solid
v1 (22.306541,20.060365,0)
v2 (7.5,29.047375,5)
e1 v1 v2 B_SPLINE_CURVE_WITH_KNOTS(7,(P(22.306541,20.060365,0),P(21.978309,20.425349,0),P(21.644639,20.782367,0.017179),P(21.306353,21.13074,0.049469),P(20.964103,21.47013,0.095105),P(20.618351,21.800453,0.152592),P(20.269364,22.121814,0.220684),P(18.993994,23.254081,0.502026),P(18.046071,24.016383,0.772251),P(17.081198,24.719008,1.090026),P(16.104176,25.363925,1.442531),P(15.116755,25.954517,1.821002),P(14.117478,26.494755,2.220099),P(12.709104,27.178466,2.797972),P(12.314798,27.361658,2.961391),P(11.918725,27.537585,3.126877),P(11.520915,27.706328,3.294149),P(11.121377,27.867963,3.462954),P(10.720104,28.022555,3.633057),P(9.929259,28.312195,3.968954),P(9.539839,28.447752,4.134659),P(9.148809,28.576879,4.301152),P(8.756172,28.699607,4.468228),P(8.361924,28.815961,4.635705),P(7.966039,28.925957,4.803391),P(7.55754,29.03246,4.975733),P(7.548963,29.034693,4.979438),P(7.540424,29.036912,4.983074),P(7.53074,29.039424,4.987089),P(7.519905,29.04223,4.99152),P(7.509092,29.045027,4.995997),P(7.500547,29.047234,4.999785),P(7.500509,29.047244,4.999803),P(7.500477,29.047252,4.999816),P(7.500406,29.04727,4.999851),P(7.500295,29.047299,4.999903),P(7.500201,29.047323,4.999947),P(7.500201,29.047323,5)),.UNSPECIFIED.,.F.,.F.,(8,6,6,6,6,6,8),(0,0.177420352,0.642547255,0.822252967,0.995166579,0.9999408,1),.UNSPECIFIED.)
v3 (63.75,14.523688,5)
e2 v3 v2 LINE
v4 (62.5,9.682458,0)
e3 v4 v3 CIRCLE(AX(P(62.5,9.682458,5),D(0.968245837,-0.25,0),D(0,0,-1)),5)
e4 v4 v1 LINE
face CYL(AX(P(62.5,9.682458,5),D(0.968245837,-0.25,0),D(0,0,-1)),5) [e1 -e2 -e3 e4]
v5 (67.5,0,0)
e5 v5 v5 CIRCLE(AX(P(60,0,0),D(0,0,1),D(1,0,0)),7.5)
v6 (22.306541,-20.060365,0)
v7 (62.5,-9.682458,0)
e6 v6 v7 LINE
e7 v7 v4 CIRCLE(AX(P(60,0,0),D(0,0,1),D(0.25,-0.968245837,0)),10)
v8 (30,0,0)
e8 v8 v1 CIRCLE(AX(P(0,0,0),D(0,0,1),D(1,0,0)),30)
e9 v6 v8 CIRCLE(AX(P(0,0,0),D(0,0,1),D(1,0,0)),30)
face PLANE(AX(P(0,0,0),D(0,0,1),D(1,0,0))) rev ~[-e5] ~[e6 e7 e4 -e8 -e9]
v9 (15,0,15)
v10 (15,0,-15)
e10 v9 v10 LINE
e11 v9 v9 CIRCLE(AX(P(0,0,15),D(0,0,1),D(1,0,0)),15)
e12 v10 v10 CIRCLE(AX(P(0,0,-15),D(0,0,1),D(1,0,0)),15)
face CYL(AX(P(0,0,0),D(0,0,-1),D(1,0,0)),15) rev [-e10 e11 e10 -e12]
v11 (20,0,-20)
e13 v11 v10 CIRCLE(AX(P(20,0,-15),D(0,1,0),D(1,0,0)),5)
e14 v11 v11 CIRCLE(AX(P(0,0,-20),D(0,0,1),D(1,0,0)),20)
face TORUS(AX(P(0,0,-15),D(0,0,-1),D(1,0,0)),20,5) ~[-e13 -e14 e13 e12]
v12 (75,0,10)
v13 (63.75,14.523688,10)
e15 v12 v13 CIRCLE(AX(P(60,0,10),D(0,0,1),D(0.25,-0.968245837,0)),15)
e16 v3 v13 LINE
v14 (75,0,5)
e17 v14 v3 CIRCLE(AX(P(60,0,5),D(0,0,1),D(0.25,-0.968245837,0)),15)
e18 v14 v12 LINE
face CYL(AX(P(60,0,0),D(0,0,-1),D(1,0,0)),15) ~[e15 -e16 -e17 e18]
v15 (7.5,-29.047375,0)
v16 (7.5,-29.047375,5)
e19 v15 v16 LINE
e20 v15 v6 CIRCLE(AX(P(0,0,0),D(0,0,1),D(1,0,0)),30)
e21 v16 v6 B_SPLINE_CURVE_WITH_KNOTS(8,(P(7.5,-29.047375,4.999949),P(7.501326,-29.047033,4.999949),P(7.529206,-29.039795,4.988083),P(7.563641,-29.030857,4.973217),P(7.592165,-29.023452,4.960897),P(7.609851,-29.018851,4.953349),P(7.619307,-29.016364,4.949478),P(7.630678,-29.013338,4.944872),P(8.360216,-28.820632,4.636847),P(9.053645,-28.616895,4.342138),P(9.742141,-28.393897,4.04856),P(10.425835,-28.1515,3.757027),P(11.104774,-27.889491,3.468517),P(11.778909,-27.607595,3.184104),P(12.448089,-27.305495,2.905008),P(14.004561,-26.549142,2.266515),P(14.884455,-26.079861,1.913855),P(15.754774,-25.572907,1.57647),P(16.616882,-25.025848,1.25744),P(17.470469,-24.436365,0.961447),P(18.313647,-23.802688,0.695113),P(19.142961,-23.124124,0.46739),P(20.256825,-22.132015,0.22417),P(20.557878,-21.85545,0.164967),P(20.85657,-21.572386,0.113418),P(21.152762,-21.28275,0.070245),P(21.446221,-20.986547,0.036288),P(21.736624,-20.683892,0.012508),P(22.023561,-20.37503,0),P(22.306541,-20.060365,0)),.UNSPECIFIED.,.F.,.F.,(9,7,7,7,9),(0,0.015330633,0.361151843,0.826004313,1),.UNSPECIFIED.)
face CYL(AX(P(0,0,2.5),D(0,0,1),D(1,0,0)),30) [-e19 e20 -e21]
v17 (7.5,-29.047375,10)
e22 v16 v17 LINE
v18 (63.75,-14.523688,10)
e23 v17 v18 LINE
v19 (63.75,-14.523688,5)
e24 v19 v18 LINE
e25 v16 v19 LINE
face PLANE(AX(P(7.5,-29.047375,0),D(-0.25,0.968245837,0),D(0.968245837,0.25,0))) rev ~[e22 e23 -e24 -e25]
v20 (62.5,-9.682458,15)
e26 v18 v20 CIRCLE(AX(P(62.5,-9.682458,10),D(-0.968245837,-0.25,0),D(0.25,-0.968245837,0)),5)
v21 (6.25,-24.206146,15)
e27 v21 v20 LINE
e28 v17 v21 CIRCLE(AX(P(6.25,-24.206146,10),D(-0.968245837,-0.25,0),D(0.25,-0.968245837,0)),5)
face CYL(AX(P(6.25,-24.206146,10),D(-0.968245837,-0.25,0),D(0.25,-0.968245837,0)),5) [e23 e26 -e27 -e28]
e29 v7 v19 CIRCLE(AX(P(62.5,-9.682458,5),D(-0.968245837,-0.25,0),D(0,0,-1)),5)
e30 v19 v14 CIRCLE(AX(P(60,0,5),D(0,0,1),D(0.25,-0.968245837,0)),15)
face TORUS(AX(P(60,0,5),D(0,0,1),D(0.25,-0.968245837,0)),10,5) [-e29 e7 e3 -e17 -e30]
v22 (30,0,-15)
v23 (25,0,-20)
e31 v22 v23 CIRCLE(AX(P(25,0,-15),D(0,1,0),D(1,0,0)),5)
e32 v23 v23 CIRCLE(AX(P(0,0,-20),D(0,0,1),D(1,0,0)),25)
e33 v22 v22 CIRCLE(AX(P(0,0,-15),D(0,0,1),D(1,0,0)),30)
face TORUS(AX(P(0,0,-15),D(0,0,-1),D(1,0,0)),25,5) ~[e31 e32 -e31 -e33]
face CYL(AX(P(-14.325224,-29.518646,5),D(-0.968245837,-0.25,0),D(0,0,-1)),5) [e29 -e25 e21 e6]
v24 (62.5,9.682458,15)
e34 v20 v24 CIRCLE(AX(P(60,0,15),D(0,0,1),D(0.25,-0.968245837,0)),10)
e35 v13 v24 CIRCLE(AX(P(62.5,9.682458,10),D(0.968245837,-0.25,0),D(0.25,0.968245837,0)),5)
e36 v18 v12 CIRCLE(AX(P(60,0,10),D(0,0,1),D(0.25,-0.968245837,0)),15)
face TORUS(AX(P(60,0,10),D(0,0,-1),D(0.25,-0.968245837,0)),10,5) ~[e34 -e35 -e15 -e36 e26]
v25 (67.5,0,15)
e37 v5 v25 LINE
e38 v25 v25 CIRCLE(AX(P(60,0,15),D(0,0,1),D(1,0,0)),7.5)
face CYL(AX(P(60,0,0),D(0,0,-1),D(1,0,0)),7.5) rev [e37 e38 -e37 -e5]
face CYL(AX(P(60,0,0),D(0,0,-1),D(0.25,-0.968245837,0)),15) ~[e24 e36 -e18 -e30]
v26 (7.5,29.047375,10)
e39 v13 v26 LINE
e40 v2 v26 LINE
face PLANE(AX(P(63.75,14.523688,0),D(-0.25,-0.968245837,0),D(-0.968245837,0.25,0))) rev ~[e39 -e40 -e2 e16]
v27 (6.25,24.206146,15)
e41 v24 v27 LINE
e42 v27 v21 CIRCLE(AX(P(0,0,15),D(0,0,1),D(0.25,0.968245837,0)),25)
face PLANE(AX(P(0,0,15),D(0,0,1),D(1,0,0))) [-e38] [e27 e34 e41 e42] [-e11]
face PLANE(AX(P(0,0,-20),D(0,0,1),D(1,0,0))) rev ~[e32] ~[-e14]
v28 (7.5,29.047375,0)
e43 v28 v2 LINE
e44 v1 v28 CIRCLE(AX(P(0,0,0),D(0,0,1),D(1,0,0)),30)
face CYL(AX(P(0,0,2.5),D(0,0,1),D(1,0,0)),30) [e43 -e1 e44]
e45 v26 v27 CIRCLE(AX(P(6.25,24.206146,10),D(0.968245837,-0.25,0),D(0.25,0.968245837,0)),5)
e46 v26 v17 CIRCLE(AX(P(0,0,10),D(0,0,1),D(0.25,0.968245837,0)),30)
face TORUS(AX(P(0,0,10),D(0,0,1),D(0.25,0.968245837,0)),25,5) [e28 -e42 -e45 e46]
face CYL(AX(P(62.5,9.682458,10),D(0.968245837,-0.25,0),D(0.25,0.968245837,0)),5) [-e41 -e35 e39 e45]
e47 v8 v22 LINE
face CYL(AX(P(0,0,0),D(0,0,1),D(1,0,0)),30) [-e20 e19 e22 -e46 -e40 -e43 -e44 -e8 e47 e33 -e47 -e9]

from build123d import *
from build123d import SkipClean  # not in build123d's __all__

# Parameters (mm, degrees)
F0_R         = 15
F0_R_2       = 7.5
F1_DEPTH     = 15
F2_DEPTH     = 20
F3_R         = 5
F4_T1_DEPTH  = 58.0947501931
F4_T3_DEPTH  = 58.0947501931
F4_T8_DEPTH  = 79.3447501931
F4_S9_R      = 30
F4_T10_DEPTH = 43
F4_T12_ANGLE = 151.0449756281
F4_T14_ANGLE = 151.0449756281
F4_T18_DEPTH = 79.3447501931
F4_S19_R     = 30
F4_T20_DEPTH = 43
F4_T22_ANGLE = 208.9550243719


# Not quite as in the source:
# - a fillet or chamfer that OpenCascade refuses, or shapes differently, is made with other operations: its cross-section is extruded or revolved along the edge and cut away or added


with BuildPart() as f1:
    # F0 (on Top) → F1 (new body)
    with BuildSketch(Plane.XY):
        with BuildLine():
            ThreePointArc((7.5, -29.0473750966), (23.7170824513, -18.3711730709), (30, 0))
            ThreePointArc((30, 0), (23.7170824513, 18.3711730709), (7.5, 29.0473750966))
            ThreePointArc((7.5, 29.0473750966), (-30, 0), (7.5, -29.0473750966))
        make_face()
        Circle(F0_R, mode=Mode.SUBTRACT)
        with BuildLine():
            ThreePointArc((7.5, 29.0473750966), (23.7170824513, 18.3711730709), (30, 0))
            ThreePointArc((30, 0), (23.7170824513, -18.3711730709), (7.5, -29.0473750966))
            Line((7.5, -29.0473750966), (63.75, -14.5236875483))
            ThreePointArc((63.75, -14.5236875483), (45, 0), (63.75, 14.5236875483))
            Line((63.75, 14.5236875483), (7.5, 29.0473750966))
        make_face()
        with BuildLine():
            ThreePointArc((75, 0), (71.8585412256, 9.1855865354), (63.75, 14.5236875483))
            ThreePointArc((63.75, 14.5236875483), (45, 0), (63.75, -14.5236875483))
            ThreePointArc((63.75, -14.5236875483), (71.8585412256, -9.1855865354), (75, 0))
        make_face()
        with Locations((60, 0)):
            Circle(F0_R_2, mode=Mode.SUBTRACT)
    extrude(amount=F1_DEPTH)

    # F0 (on Top) → F2 (join)
    with BuildSketch(Plane.XY):
        with BuildLine():
            ThreePointArc((7.5, -29.0473750966), (23.7170824513, -18.3711730709), (30, 0))
            ThreePointArc((30, 0), (23.7170824513, 18.3711730709), (7.5, 29.0473750966))
            ThreePointArc((7.5, 29.0473750966), (-30, 0), (7.5, -29.0473750966))
        make_face()
        Circle(F0_R, mode=Mode.SUBTRACT)
    with SkipClean():  # cleaning this boolean's faces spoils the solid; the shape is the same uncleaned
        extrude(amount=-F2_DEPTH)

    # F3
    f3_edges = [f1.edges().sort_by_distance(p)[0] for p in [
        (-7.5, 29.047375, -20),
        (-15, 0, -20),
    ]]
    fillet(f3_edges, radius=F3_R)

    # F4: fillet of radius 5 on 11 edges, made by hand

    # F4_s2 → F4_t1 (cut)
    with BuildSketch(Plane(origin=(0, 0, 0), x_dir=(0, 0, 1), z_dir=(0.9682458366, 0.25, 0))):
        with BuildLine():
            ThreePointArc((10, 30), (13.5355339059, 28.5355339059), (15, 25))
            Line((15, 25), (15, 30))
            Line((15, 30), (10, 30))
        make_face()
    extrude(amount=F4_T1_DEPTH, mode=Mode.SUBTRACT)

    # F4_s4 → F4_t3 (cut)
    with BuildSketch(Plane(origin=(56.25, -14.5236875483, 0), x_dir=(0, 0, 1), z_dir=(-0.9682458366, 0.25, 0))):
        with BuildLine():
            ThreePointArc((10, 30), (13.5355339059, 28.5355339059), (15, 25))
            Line((15, 25), (15, 30))
            Line((15, 30), (10, 30))
        make_face()
    extrude(amount=F4_T3_DEPTH, mode=Mode.SUBTRACT)


with BuildPart() as f4_tool6:
    # F4_s7 → F4_t8 (new body)
    with BuildSketch(Plane(origin=(-20.5752240267, -5.3125, 0), x_dir=(0, 0, 1), z_dir=(0.9682458366, 0.25, 0))):
        with BuildLine():
            ThreePointArc((0, 25), (1.4644660941, 28.5355339059), (5, 30))
            Line((5, 30), (0, 30))
            Line((0, 30), (0, 25))
        make_face()
    extrude(amount=F4_T8_DEPTH)

    # F4_s9 → F4_t10 (cut, symmetric)
    with BuildSketch(Plane.XY.offset(2.5)):
        Circle(F4_S9_R)
    extrude(amount=F4_T10_DEPTH, both=True, mode=Mode.SUBTRACT)


with BuildPart() as f1_1:
    add(f1.part, clean=False)

    # F4_t5: cut F4_tool6
    add(f4_tool6.part, mode=Mode.SUBTRACT)

    # F4_s11 → F4_t12 (revolve, cut)
    with BuildSketch(Plane(origin=(56.25, 14.5236875483, 0), x_dir=(0, 0, 1), z_dir=(-0.9682458366, -0.25, 0))):
        with BuildLine():
            ThreePointArc((0, -25), (1.4644660941, -28.5355339059), (5, -30))
            Line((5, -30), (0, -30))
            Line((0, -30), (0, -25))
        make_face()
    revolve(axis=Axis((60, 0, 0), (0, 0, 1)), revolution_arc=F4_T12_ANGLE, mode=Mode.SUBTRACT)

    # F4_s13 → F4_t14 (revolve, cut)
    with BuildSketch(Plane(origin=(56.25, 14.5236875483, 0), x_dir=(0, 0, 1), z_dir=(-0.9682458366, -0.25, 0))):
        with BuildLine():
            ThreePointArc((15, -25), (13.5355339059, -28.5355339059), (10, -30))
            Line((10, -30), (15, -30))
            Line((15, -30), (15, -25))
        make_face()
    revolve(axis=Axis((60, 0, 15), (0, 0, 1)), revolution_arc=F4_T14_ANGLE, mode=Mode.SUBTRACT)


with BuildPart() as f4_tool16:
    # F4_s17 → F4_t18 (new body)
    with BuildSketch(Plane(origin=(56.25, -14.5236875483, 0), x_dir=(0, 0, 1), z_dir=(-0.9682458366, 0.25, 0))):
        with BuildLine():
            ThreePointArc((0, 25), (1.4644660941, 28.5355339059), (5, 30))
            Line((5, 30), (0, 30))
            Line((0, 30), (0, 25))
        make_face()
    extrude(amount=F4_T18_DEPTH)

    # F4_s19 → F4_t20 (cut, symmetric)
    with BuildSketch(Plane.XY.offset(2.5)):
        Circle(F4_S19_R)
    extrude(amount=F4_T20_DEPTH, both=True, mode=Mode.SUBTRACT)


with BuildPart() as f1_2:
    add(f1_1.part, clean=False)

    # F4_t15: cut F4_tool16
    add(f4_tool16.part, mode=Mode.SUBTRACT)

    # F4_s21 → F4_t22 (revolve, cut)
    with BuildSketch(Plane(origin=(0, 0, 0), x_dir=(0, 0, 1), z_dir=(0.9682458366, -0.25, 0))):
        with BuildLine():
            ThreePointArc((10, -30), (13.5355339059, -28.5355339059), (15, -25))
            Line((15, -25), (15, -30))
            Line((15, -30), (10, -30))
        make_face()
    revolve(axis=Axis((0, 0, 15), (0, 0, 1)), revolution_arc=F4_T22_ANGLE, mode=Mode.SUBTRACT)


solid = f1_2.part
